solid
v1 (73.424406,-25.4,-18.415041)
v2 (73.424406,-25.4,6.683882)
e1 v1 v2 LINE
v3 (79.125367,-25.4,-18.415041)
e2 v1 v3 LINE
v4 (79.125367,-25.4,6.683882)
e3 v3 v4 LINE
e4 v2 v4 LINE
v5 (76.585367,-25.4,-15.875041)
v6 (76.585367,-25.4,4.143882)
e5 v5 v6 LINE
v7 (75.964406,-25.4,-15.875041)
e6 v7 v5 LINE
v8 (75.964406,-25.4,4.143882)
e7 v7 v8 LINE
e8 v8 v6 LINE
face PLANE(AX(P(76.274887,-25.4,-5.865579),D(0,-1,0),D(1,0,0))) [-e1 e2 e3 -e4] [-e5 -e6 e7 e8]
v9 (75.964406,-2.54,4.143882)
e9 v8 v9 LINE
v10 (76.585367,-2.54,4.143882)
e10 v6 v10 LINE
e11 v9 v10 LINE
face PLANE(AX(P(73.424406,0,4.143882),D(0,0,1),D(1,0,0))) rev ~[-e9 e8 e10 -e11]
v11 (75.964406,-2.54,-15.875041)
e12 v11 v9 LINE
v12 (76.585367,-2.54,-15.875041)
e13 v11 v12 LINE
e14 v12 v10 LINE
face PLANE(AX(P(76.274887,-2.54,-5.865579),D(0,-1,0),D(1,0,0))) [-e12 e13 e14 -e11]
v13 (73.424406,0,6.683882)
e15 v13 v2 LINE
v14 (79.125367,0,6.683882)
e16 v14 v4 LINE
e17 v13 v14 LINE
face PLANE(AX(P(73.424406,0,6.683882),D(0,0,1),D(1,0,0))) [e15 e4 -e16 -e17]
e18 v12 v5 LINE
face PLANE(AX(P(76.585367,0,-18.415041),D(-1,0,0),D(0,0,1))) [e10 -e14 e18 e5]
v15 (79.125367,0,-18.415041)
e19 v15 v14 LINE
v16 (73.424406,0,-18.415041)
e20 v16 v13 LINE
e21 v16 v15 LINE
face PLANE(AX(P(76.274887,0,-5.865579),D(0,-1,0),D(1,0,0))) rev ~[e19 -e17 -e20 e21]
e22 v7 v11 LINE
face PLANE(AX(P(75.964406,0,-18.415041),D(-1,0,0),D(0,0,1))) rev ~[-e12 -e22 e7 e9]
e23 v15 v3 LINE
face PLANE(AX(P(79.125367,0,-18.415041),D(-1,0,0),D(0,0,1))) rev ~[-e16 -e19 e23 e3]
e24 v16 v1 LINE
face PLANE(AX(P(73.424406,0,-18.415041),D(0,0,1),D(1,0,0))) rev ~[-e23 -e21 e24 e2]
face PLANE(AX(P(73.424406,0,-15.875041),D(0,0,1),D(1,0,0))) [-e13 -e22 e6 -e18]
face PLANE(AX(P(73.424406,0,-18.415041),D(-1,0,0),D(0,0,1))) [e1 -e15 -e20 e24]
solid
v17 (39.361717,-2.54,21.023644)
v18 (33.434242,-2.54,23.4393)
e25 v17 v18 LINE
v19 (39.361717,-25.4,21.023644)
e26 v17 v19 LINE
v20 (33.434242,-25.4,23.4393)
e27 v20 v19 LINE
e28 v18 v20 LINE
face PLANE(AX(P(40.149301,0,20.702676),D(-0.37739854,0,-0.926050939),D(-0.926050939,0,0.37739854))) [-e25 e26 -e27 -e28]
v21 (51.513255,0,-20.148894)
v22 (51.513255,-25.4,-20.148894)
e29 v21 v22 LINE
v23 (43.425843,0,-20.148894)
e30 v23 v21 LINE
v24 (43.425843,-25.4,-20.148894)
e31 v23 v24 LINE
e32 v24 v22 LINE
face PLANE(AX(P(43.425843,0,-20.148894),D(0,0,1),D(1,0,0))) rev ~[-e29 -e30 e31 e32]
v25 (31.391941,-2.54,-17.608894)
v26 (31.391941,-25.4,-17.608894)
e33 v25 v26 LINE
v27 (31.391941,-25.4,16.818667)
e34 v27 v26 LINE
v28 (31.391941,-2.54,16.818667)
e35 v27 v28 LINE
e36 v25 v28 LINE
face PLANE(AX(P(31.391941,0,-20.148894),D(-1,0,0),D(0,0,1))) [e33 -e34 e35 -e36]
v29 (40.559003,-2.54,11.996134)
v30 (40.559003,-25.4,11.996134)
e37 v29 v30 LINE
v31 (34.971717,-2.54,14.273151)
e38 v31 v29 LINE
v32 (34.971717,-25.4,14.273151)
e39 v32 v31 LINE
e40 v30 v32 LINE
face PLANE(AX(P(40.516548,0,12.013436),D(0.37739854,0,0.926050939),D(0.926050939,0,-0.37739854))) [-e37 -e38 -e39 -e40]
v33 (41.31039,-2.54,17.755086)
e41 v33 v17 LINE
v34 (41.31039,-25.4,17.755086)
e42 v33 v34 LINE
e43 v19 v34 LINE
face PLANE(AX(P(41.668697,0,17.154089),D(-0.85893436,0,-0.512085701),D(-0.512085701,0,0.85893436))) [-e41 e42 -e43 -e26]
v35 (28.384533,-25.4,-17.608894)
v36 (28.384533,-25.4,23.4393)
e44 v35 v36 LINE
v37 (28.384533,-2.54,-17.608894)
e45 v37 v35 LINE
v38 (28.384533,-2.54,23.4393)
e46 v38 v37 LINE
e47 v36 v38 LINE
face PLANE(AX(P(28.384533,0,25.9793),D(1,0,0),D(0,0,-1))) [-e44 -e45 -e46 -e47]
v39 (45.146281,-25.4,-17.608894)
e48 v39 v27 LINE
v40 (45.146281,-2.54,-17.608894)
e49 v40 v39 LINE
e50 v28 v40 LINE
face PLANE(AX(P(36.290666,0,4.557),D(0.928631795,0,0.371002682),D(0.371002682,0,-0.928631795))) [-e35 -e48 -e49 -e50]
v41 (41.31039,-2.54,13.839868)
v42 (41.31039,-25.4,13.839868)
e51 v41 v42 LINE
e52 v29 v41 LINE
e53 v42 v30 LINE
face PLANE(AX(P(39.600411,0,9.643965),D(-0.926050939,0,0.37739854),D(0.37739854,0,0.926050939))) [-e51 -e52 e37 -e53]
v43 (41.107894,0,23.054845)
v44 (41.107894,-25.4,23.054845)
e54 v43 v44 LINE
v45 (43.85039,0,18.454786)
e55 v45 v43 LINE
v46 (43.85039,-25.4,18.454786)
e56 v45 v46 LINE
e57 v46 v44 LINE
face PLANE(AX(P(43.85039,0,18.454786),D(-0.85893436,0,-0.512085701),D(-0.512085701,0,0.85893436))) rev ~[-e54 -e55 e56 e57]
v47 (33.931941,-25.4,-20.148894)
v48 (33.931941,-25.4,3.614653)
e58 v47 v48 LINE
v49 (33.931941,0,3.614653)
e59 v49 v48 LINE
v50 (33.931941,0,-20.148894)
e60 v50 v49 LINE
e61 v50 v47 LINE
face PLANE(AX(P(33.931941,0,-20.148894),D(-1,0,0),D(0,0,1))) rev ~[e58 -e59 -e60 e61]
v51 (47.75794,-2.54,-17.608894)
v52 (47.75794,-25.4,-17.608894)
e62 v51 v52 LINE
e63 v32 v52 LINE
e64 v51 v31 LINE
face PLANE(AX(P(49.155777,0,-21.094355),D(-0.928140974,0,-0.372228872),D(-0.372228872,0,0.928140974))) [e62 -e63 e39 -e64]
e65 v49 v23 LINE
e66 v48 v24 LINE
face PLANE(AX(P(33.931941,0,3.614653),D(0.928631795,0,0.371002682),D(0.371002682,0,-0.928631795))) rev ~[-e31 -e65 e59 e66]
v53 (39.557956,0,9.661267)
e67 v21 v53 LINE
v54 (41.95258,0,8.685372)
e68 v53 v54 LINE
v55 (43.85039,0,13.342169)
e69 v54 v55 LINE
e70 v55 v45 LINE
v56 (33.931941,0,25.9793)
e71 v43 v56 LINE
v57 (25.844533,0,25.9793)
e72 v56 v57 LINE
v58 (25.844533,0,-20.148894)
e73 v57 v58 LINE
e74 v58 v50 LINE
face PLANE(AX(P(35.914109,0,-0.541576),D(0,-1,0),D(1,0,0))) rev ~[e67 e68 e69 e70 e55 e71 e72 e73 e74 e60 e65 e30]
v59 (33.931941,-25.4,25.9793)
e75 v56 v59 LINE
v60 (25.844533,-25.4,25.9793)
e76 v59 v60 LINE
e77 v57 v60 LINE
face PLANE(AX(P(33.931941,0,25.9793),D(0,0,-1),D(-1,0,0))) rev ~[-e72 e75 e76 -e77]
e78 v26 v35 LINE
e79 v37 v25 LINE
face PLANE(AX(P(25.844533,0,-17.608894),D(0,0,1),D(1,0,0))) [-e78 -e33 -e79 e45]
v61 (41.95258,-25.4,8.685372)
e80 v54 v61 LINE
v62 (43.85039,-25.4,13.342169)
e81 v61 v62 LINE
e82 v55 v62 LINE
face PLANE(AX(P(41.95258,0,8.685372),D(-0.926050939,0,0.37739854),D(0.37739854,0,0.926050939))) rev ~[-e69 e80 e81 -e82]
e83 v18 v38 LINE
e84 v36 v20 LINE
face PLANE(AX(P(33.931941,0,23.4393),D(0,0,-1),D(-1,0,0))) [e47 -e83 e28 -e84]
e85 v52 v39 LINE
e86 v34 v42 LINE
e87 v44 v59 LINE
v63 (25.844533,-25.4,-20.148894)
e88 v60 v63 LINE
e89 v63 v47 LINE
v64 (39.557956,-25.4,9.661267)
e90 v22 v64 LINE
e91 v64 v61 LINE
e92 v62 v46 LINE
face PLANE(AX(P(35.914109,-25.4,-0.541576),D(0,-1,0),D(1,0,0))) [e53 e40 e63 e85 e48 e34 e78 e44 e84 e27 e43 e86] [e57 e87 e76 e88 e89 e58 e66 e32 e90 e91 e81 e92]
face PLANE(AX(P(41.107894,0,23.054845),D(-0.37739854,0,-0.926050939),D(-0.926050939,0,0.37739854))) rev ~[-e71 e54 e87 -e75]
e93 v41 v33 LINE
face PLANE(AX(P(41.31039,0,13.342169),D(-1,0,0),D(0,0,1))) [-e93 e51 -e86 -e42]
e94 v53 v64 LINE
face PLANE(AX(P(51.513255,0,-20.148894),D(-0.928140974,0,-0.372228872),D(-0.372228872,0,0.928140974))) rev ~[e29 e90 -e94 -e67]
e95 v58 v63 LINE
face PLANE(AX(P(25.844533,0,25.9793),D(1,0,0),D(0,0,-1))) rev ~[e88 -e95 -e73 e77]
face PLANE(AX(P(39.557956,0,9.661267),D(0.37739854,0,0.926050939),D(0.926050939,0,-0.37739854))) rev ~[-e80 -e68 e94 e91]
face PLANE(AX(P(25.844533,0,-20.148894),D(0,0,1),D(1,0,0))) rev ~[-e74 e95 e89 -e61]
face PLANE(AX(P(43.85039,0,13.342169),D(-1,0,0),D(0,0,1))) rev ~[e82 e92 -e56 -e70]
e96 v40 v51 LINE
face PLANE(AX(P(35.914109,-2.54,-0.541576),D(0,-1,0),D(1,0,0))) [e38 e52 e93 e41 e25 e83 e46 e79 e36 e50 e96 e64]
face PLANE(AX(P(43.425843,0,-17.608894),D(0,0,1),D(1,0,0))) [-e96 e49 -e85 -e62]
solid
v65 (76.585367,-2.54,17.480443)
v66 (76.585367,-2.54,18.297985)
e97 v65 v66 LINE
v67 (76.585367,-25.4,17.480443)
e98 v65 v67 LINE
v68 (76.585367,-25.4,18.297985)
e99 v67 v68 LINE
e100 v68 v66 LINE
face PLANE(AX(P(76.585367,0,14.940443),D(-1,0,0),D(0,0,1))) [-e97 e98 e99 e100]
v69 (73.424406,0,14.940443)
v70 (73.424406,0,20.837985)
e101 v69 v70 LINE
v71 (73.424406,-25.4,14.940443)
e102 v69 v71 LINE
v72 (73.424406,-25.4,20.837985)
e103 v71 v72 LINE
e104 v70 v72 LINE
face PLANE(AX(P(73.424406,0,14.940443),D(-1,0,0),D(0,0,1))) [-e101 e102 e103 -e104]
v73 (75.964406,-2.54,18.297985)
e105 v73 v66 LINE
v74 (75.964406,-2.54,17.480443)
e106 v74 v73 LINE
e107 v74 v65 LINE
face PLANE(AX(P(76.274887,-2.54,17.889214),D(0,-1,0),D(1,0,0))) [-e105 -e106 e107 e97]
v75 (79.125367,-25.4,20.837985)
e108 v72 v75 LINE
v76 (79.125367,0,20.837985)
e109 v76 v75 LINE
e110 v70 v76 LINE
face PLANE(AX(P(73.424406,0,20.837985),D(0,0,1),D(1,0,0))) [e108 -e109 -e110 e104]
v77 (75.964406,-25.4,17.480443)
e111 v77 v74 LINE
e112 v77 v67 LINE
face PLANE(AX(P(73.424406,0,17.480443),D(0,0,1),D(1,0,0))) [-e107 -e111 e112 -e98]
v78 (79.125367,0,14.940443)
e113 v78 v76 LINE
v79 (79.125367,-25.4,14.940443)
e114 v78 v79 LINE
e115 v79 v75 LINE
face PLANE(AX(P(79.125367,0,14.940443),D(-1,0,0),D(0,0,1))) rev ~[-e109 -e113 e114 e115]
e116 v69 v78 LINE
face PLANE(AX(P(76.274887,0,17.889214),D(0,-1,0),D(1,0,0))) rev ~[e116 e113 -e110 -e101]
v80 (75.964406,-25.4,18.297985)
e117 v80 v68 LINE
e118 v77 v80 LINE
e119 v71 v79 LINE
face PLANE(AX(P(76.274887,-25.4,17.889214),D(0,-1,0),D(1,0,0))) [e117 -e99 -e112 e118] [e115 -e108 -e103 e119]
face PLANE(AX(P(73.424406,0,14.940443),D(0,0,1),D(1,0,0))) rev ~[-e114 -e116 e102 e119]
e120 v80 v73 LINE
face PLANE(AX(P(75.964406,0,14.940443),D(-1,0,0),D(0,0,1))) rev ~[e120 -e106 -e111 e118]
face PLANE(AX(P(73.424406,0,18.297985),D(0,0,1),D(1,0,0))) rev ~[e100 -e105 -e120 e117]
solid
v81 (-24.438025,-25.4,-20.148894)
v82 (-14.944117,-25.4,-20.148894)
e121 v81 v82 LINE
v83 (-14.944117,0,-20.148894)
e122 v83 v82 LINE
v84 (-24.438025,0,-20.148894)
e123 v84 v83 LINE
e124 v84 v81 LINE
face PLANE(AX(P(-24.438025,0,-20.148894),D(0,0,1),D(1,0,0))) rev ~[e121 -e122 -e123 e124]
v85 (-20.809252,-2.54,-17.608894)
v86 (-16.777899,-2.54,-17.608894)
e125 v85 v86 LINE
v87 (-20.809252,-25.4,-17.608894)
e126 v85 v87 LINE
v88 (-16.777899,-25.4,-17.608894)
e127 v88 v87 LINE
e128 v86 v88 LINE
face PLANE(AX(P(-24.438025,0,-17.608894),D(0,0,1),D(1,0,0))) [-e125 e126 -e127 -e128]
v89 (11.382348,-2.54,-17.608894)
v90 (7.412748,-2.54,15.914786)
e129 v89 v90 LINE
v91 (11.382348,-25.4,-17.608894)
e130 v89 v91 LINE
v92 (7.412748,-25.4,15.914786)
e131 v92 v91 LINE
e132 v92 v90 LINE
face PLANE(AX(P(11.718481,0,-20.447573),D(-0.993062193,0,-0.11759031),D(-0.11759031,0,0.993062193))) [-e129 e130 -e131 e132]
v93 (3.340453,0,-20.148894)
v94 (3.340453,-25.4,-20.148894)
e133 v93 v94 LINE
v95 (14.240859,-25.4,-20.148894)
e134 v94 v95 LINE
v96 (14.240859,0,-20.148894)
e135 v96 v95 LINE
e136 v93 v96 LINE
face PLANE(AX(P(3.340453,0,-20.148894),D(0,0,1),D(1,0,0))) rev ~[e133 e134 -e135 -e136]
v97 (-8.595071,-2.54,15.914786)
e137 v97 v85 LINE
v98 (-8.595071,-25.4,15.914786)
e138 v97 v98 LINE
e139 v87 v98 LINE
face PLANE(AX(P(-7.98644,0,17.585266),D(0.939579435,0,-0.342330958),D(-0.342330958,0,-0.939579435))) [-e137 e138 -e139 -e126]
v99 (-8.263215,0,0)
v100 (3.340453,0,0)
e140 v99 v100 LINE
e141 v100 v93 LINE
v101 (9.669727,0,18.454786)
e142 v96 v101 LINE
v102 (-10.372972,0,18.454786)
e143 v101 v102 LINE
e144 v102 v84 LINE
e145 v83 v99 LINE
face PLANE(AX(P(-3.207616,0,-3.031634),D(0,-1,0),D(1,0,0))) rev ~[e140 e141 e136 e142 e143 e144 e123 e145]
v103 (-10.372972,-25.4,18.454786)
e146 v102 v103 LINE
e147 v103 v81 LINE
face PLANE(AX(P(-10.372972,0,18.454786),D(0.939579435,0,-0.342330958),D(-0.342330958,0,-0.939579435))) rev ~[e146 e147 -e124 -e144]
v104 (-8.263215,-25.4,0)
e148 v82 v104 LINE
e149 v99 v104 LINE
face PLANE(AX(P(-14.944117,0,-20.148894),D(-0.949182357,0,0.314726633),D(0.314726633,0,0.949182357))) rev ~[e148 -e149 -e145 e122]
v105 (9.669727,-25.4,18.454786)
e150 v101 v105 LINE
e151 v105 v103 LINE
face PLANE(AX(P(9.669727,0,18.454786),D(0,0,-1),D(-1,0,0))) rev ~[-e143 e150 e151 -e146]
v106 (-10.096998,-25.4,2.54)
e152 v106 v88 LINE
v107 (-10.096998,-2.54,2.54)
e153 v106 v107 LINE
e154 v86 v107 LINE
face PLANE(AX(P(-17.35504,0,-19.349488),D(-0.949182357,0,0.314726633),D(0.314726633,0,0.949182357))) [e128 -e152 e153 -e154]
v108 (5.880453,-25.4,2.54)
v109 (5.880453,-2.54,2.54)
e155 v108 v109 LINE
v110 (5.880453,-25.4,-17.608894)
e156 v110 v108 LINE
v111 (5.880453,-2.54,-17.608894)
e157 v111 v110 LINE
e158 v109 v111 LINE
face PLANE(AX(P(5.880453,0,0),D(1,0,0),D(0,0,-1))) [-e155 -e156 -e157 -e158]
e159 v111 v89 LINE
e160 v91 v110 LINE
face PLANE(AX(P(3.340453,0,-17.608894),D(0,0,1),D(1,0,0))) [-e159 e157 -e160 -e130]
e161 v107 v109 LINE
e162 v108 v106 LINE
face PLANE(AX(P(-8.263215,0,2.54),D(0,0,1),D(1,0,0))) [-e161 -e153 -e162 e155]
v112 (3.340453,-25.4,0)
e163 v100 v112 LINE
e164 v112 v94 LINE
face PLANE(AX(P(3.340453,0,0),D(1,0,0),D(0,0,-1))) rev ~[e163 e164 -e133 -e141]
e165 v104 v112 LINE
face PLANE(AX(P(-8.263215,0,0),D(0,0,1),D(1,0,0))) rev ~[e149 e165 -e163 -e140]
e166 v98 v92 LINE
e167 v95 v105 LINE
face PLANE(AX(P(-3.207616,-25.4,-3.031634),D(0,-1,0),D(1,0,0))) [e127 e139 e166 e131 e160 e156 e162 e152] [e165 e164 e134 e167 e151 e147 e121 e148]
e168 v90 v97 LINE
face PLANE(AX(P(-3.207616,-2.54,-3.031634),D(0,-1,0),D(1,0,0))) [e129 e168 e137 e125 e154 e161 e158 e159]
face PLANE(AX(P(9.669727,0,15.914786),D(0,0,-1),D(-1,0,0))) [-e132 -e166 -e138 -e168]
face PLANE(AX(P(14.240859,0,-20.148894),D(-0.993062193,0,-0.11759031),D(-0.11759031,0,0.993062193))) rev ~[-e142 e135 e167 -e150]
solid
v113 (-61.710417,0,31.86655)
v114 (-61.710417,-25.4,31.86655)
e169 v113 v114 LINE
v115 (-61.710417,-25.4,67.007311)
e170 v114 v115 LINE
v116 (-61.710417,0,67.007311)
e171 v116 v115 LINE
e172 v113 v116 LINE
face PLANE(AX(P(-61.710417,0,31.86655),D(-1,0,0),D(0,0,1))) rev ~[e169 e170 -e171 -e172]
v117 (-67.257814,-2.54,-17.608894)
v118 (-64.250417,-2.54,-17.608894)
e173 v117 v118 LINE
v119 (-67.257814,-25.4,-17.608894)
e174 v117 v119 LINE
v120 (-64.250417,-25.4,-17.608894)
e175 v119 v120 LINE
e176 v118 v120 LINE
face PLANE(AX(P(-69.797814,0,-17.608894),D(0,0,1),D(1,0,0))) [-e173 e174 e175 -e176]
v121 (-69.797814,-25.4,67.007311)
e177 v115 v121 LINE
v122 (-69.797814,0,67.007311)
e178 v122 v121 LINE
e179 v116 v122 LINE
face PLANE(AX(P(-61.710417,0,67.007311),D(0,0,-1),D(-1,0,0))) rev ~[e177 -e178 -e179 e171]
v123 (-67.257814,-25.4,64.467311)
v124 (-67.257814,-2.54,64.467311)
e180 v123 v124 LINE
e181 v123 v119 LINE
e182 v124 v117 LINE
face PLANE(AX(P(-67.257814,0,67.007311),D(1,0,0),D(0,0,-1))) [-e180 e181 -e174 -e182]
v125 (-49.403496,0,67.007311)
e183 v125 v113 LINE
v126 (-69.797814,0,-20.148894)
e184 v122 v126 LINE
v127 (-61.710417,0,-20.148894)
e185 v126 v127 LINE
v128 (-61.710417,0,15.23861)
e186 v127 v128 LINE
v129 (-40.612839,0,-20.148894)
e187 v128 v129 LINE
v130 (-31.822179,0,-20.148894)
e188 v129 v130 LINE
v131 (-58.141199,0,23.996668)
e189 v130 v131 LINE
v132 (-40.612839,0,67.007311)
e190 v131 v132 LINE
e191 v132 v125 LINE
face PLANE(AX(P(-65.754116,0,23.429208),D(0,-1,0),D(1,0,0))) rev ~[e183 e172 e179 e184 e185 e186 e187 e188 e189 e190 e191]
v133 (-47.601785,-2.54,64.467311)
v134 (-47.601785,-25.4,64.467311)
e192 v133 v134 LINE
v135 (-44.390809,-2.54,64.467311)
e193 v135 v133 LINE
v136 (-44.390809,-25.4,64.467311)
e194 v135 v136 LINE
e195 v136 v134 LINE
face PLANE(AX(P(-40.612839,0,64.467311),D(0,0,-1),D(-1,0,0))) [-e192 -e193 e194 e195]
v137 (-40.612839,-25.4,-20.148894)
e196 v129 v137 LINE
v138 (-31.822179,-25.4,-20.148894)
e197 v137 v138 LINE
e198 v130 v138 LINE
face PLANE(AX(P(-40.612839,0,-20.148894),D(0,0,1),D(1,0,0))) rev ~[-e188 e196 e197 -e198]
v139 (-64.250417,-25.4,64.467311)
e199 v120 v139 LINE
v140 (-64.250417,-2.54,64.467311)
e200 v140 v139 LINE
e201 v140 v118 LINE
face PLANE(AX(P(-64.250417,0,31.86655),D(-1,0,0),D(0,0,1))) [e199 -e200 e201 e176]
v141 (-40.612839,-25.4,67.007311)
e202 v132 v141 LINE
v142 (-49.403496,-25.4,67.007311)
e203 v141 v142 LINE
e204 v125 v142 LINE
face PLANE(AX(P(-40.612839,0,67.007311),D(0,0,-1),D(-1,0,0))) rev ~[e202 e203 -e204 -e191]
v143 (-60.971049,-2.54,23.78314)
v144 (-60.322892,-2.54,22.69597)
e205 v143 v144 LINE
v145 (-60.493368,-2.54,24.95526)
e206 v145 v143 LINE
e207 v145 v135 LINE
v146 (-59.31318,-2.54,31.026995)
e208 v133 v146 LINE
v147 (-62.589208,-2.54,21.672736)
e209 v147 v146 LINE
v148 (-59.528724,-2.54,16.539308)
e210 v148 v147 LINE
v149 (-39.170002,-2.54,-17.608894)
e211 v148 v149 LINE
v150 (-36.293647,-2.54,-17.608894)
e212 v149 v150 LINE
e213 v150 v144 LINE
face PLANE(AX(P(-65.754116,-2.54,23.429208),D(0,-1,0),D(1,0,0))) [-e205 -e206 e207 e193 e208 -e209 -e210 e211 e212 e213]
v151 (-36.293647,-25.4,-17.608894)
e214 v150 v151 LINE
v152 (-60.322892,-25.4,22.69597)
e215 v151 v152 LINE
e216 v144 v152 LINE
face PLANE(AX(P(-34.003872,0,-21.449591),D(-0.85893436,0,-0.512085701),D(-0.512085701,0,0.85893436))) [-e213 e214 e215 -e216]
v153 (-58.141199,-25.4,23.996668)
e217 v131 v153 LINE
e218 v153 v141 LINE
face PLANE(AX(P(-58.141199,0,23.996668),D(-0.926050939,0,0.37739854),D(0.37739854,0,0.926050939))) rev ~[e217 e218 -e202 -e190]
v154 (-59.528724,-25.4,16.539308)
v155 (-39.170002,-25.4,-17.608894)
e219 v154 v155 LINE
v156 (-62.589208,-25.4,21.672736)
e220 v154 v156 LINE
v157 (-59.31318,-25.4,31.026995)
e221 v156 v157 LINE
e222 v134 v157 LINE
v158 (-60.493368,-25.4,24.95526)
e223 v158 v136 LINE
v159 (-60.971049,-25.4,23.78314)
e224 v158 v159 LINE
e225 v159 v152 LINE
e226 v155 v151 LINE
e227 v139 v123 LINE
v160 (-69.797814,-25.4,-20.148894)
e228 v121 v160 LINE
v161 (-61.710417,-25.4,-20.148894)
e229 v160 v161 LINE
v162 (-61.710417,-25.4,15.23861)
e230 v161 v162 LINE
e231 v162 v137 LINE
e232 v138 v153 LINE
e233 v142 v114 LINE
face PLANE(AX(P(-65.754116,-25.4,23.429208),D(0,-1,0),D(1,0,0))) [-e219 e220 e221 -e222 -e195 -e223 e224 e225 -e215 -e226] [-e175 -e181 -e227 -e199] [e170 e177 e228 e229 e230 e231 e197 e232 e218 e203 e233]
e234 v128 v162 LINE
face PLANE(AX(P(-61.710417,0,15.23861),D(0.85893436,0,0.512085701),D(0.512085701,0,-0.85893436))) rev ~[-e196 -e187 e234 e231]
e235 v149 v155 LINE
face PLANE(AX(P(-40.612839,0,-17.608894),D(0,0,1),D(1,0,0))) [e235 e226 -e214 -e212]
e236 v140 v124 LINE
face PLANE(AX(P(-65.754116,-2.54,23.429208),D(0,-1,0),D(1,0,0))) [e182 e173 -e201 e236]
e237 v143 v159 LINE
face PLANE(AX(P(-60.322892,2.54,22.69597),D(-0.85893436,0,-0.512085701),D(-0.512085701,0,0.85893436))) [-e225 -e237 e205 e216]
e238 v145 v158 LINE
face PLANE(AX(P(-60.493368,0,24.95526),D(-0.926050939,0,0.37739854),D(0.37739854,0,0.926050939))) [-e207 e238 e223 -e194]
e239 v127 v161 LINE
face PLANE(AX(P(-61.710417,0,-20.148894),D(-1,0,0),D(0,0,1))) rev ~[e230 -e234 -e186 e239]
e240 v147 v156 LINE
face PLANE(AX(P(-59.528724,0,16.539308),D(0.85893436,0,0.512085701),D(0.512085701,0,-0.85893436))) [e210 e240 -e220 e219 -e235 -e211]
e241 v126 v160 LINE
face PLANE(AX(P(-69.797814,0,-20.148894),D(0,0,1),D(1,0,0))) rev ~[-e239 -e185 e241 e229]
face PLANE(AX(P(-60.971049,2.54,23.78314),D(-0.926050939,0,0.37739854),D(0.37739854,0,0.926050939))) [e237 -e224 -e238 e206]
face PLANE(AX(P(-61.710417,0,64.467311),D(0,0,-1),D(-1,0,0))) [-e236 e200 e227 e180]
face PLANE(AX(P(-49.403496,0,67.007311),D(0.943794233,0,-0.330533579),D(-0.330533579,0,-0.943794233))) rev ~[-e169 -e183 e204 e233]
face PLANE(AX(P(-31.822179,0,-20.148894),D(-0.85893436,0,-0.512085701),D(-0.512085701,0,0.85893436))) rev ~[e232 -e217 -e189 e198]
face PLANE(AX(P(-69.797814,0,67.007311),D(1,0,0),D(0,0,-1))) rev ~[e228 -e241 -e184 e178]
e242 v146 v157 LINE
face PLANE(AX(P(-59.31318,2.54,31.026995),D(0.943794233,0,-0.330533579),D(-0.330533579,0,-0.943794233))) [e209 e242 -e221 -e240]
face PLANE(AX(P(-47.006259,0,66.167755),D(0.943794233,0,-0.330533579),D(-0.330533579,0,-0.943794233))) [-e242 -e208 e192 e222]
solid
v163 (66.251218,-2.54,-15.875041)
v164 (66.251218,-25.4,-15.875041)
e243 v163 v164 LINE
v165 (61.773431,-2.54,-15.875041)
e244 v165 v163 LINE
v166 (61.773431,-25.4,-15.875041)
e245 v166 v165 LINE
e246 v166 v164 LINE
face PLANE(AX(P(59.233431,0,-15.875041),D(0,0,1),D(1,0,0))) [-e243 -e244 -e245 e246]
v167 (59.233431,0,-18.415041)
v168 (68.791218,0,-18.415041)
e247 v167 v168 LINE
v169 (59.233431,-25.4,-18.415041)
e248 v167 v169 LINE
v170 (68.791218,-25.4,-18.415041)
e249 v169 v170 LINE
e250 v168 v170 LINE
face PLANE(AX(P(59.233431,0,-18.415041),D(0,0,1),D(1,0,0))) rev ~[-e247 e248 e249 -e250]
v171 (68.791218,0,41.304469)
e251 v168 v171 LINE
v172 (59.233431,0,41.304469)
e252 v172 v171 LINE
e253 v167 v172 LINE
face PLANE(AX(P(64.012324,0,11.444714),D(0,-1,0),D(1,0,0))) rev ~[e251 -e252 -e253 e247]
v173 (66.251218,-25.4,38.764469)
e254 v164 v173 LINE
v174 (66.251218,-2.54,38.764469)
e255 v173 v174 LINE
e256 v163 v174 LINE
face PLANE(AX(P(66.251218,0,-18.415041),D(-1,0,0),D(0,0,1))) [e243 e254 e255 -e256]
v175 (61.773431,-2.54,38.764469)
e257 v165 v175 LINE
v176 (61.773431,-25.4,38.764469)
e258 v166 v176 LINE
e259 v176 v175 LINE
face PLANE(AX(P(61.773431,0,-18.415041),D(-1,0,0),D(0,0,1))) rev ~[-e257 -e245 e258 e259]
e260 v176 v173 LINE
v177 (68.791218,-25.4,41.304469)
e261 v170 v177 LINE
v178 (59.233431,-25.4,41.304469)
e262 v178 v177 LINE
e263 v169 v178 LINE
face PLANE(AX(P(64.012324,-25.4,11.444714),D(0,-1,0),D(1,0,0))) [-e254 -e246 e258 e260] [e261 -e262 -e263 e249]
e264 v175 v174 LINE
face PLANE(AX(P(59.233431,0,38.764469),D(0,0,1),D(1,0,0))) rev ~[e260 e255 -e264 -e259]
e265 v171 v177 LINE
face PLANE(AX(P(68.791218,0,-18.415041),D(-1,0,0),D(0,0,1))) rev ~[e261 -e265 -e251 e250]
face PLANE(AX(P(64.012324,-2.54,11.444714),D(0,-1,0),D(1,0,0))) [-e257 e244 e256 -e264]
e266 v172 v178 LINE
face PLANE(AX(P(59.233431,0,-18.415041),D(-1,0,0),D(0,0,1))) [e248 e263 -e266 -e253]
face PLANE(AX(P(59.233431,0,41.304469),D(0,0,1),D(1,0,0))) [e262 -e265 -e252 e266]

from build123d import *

# Parameters (mm, degrees)
F1_DEPTH    = 25.4
F0_W        = 9.557787329
F0_H        = 59.7195103765
F0_W_2      = 5.7009607553
F0_H_2      = 25.0989235938
F0_H_3      = 5.8975424618
F2_T        = -2.54
F3_T        = -2.54
F4_T        = -2.54
F5_T        = 2.54
F5_T3_DEPTH = 30.48
F6_T        = -2.54
F6_2_T      = -2.54


# Not quite as in the source:
# - a shell that OpenCascade refuses in one call is made with other operations: the cavity is built on its own and cut out


with BuildPart() as f1:
    # F0 (on Front) → F1 (new body)
    with BuildSketch(Plane.XZ):
        Polygon((-69.7978138924, 67.0073106885), (-69.7978138924, -20.1488938183), (-61.7104172707, -20.1488938183), (-61.7104172707, 15.2386100963), (-61.7104172707, 31.8665504456), (-61.7104172707, 67.0073106885), align=None)
        Polygon((-61.7104172707, 31.8665504456), (-61.7104172707, 15.2386100963), (-58.1411987634, 23.9966676942), (-40.6128391623, 67.0073106885), (-49.4034960866, 67.0073106885), align=None)
        Polygon((-58.1411987634, 23.9966676942), (-61.7104172707, 15.2386100963), (-40.6128391623, -20.1488938183), (-31.8221785128, -20.1488938183), align=None)
    extrude(amount=F1_DEPTH)

    # F5: shell of thickness 2.54, made by hand


with BuildPart() as f1b:
    # F0 (on Front) → F1, piece 2 (new body)
    with BuildSketch(Plane.XZ):
        Polygon((9.6697267145, 18.4547863901), (-10.3729721159, 18.4547863901), (-24.4380254298, -20.1488938183), (-14.944116585, -20.1488938183), (-8.2632154226, 0), (3.3404529095, 0), (3.3404529095, -20.1488938183), (14.2408590764, -20.1488938183), align=None)
    extrude(amount=F1_DEPTH)

    # F2
    f2_openings = [f1b.faces().sort_by_distance(p)[0] for p in [
        (-0.351623, -25.4, 17.908316),
    ]]
    offset(amount=F2_T, openings=f2_openings, kind=Kind.INTERSECTION)


with BuildPart() as f1c:
    # F0 (on Front) → F1, piece 3 (new body)
    with BuildSketch(Plane.XZ):
        Polygon((25.8445329964, 25.9793000181), (25.8445329964, 18.4547863901), (25.8445329964, 6.7574218847), (25.8445329964, -20.1488938183), (33.931940794, -20.1488938183), (33.931940794, 3.6146529019), (43.4258431196, -20.1488938183), (51.5132546425, -20.1488938183), (39.5579561591, 9.6612665802), (41.9525803864, 8.6853724377), (43.8503899663, 13.3421693182), (43.8503899663, 18.4547863901), (41.1078936159, 23.0548452138), (33.931940794, 25.9793000181), align=None)
    extrude(amount=F1_DEPTH)

    # F4
    f4_openings = [f1c.faces().sort_by_distance(p)[0] for p in [
        (35.185702, -25.4, 2.749804),
    ]]
    offset(amount=F4_T, openings=f4_openings, kind=Kind.INTERSECTION)


with BuildPart() as f1d:
    # F0 (on Front) → F1, piece 4 (new body)
    with BuildSketch(Plane.XZ):
        with Locations((64.0123244375, 11.4447139204)):
            Rectangle(F0_W, F0_H)
    extrude(amount=F1_DEPTH)

    # F3
    f3_openings = [f1d.faces().sort_by_distance(p)[0] for p in [
        (64.012324, -25.4, 11.444714),
    ]]
    offset(amount=F3_T, openings=f3_openings)


with BuildPart() as f1e:
    # F0 (on Front) → F1, piece 5 (new body)
    with BuildSketch(Plane.XZ):
        with Locations((76.2748867273, -5.865579471)):
            Rectangle(F0_W_2, F0_H_2)
    extrude(amount=F1_DEPTH)

    # F6
    f6_openings = [f1e.faces().sort_by_distance(p)[0] for p in [
        (76.274887, -25.4, -5.865579),
    ]]
    offset(amount=F6_T, openings=f6_openings)


with BuildPart() as f1f:
    # F0 (on Front) → F1, piece 6 (new body)
    with BuildSketch(Plane.XZ):
        with Locations((76.2748867273, 17.8892137483)):
            Rectangle(F0_W_2, F0_H_3)
    extrude(amount=F1_DEPTH)

    # F6#2
    f6_2_openings = [f1f.faces().sort_by_distance(p)[0] for p in [
        (76.274887, -25.4, 17.889214),
    ]]
    offset(amount=F6_2_T, openings=f6_2_openings)


with BuildPart() as f5_core1:
    # F5_t2: copy of F1
    add(f1.part)

    # the walls: a layer under each face that stays
    f5_faces = [f5_core1.faces().sort_by_distance(p)[0] for p in [
        (-69.7978138924, -12.7, 23.4292084351),
        (-65.7541155815, -12.7, -20.1488938183),
        (-61.7104172707, -12.7, -2.455141861),
        (-51.1616282165, -12.7, -2.455141861),
        (-36.2175088376, -12.7, -20.1488938183),
        (-44.9816886381, -12.7, 1.923886938),
        (-49.3770189629, -12.7, 45.5019891914),
        (-45.0081676245, -12.7, 67.0073106885),
        (-55.5569566786, -12.7, 49.436930567),
        (-61.7104172707, -12.7, 49.436930567),
        (-65.7541155815, -12.7, 67.0073106885),
        (-63.4685413291, 0, -5.6228597338),
    ]]
    thicken(f5_faces, amount=-F5_T, mode=Mode.SUBTRACT)

    # F5_s4 → F5_t3 (cut)
    with BuildSketch(Plane.XZ.offset(-2.54)):
        Polygon((-61.7068342034, 15.2256031195), (-64.2504172707, 15.2386100963), (-64.2504172707, 24.4591238986), (-59.5287239963, 16.5393077769), align=None)
        Polygon((-58.0958601368, 24.0000887481), (-60.3228920378, 22.6959700136), (-60.9710486864, 23.7831396319), (-60.493368149, 24.9552599859), align=None)
        Polygon((-61.7089896442, 31.8749459985), (-59.3131799199, 31.0269951562), (-64.2504172707, 16.9293771238), (-64.2504172707, 31.8665504456), align=None)
    extrude(amount=F5_T3_DEPTH, mode=Mode.SUBTRACT)


with BuildPart() as f1_1:
    add(f1.part)

    # what is left inside the walls is the cavity
    f5_cavity = [f5_core1.part.solids().sort_by_distance(p)[0] for p in [
        (-67.232414, -17.78, 23.429208),
        (-48.330086, -17.78, 2.530531),
    ]]
    add(f5_cavity, mode=Mode.SUBTRACT)


solid = Compound([f1b.part, f1c.part, f1d.part, f1e.part, f1f.part, f1_1.part])
